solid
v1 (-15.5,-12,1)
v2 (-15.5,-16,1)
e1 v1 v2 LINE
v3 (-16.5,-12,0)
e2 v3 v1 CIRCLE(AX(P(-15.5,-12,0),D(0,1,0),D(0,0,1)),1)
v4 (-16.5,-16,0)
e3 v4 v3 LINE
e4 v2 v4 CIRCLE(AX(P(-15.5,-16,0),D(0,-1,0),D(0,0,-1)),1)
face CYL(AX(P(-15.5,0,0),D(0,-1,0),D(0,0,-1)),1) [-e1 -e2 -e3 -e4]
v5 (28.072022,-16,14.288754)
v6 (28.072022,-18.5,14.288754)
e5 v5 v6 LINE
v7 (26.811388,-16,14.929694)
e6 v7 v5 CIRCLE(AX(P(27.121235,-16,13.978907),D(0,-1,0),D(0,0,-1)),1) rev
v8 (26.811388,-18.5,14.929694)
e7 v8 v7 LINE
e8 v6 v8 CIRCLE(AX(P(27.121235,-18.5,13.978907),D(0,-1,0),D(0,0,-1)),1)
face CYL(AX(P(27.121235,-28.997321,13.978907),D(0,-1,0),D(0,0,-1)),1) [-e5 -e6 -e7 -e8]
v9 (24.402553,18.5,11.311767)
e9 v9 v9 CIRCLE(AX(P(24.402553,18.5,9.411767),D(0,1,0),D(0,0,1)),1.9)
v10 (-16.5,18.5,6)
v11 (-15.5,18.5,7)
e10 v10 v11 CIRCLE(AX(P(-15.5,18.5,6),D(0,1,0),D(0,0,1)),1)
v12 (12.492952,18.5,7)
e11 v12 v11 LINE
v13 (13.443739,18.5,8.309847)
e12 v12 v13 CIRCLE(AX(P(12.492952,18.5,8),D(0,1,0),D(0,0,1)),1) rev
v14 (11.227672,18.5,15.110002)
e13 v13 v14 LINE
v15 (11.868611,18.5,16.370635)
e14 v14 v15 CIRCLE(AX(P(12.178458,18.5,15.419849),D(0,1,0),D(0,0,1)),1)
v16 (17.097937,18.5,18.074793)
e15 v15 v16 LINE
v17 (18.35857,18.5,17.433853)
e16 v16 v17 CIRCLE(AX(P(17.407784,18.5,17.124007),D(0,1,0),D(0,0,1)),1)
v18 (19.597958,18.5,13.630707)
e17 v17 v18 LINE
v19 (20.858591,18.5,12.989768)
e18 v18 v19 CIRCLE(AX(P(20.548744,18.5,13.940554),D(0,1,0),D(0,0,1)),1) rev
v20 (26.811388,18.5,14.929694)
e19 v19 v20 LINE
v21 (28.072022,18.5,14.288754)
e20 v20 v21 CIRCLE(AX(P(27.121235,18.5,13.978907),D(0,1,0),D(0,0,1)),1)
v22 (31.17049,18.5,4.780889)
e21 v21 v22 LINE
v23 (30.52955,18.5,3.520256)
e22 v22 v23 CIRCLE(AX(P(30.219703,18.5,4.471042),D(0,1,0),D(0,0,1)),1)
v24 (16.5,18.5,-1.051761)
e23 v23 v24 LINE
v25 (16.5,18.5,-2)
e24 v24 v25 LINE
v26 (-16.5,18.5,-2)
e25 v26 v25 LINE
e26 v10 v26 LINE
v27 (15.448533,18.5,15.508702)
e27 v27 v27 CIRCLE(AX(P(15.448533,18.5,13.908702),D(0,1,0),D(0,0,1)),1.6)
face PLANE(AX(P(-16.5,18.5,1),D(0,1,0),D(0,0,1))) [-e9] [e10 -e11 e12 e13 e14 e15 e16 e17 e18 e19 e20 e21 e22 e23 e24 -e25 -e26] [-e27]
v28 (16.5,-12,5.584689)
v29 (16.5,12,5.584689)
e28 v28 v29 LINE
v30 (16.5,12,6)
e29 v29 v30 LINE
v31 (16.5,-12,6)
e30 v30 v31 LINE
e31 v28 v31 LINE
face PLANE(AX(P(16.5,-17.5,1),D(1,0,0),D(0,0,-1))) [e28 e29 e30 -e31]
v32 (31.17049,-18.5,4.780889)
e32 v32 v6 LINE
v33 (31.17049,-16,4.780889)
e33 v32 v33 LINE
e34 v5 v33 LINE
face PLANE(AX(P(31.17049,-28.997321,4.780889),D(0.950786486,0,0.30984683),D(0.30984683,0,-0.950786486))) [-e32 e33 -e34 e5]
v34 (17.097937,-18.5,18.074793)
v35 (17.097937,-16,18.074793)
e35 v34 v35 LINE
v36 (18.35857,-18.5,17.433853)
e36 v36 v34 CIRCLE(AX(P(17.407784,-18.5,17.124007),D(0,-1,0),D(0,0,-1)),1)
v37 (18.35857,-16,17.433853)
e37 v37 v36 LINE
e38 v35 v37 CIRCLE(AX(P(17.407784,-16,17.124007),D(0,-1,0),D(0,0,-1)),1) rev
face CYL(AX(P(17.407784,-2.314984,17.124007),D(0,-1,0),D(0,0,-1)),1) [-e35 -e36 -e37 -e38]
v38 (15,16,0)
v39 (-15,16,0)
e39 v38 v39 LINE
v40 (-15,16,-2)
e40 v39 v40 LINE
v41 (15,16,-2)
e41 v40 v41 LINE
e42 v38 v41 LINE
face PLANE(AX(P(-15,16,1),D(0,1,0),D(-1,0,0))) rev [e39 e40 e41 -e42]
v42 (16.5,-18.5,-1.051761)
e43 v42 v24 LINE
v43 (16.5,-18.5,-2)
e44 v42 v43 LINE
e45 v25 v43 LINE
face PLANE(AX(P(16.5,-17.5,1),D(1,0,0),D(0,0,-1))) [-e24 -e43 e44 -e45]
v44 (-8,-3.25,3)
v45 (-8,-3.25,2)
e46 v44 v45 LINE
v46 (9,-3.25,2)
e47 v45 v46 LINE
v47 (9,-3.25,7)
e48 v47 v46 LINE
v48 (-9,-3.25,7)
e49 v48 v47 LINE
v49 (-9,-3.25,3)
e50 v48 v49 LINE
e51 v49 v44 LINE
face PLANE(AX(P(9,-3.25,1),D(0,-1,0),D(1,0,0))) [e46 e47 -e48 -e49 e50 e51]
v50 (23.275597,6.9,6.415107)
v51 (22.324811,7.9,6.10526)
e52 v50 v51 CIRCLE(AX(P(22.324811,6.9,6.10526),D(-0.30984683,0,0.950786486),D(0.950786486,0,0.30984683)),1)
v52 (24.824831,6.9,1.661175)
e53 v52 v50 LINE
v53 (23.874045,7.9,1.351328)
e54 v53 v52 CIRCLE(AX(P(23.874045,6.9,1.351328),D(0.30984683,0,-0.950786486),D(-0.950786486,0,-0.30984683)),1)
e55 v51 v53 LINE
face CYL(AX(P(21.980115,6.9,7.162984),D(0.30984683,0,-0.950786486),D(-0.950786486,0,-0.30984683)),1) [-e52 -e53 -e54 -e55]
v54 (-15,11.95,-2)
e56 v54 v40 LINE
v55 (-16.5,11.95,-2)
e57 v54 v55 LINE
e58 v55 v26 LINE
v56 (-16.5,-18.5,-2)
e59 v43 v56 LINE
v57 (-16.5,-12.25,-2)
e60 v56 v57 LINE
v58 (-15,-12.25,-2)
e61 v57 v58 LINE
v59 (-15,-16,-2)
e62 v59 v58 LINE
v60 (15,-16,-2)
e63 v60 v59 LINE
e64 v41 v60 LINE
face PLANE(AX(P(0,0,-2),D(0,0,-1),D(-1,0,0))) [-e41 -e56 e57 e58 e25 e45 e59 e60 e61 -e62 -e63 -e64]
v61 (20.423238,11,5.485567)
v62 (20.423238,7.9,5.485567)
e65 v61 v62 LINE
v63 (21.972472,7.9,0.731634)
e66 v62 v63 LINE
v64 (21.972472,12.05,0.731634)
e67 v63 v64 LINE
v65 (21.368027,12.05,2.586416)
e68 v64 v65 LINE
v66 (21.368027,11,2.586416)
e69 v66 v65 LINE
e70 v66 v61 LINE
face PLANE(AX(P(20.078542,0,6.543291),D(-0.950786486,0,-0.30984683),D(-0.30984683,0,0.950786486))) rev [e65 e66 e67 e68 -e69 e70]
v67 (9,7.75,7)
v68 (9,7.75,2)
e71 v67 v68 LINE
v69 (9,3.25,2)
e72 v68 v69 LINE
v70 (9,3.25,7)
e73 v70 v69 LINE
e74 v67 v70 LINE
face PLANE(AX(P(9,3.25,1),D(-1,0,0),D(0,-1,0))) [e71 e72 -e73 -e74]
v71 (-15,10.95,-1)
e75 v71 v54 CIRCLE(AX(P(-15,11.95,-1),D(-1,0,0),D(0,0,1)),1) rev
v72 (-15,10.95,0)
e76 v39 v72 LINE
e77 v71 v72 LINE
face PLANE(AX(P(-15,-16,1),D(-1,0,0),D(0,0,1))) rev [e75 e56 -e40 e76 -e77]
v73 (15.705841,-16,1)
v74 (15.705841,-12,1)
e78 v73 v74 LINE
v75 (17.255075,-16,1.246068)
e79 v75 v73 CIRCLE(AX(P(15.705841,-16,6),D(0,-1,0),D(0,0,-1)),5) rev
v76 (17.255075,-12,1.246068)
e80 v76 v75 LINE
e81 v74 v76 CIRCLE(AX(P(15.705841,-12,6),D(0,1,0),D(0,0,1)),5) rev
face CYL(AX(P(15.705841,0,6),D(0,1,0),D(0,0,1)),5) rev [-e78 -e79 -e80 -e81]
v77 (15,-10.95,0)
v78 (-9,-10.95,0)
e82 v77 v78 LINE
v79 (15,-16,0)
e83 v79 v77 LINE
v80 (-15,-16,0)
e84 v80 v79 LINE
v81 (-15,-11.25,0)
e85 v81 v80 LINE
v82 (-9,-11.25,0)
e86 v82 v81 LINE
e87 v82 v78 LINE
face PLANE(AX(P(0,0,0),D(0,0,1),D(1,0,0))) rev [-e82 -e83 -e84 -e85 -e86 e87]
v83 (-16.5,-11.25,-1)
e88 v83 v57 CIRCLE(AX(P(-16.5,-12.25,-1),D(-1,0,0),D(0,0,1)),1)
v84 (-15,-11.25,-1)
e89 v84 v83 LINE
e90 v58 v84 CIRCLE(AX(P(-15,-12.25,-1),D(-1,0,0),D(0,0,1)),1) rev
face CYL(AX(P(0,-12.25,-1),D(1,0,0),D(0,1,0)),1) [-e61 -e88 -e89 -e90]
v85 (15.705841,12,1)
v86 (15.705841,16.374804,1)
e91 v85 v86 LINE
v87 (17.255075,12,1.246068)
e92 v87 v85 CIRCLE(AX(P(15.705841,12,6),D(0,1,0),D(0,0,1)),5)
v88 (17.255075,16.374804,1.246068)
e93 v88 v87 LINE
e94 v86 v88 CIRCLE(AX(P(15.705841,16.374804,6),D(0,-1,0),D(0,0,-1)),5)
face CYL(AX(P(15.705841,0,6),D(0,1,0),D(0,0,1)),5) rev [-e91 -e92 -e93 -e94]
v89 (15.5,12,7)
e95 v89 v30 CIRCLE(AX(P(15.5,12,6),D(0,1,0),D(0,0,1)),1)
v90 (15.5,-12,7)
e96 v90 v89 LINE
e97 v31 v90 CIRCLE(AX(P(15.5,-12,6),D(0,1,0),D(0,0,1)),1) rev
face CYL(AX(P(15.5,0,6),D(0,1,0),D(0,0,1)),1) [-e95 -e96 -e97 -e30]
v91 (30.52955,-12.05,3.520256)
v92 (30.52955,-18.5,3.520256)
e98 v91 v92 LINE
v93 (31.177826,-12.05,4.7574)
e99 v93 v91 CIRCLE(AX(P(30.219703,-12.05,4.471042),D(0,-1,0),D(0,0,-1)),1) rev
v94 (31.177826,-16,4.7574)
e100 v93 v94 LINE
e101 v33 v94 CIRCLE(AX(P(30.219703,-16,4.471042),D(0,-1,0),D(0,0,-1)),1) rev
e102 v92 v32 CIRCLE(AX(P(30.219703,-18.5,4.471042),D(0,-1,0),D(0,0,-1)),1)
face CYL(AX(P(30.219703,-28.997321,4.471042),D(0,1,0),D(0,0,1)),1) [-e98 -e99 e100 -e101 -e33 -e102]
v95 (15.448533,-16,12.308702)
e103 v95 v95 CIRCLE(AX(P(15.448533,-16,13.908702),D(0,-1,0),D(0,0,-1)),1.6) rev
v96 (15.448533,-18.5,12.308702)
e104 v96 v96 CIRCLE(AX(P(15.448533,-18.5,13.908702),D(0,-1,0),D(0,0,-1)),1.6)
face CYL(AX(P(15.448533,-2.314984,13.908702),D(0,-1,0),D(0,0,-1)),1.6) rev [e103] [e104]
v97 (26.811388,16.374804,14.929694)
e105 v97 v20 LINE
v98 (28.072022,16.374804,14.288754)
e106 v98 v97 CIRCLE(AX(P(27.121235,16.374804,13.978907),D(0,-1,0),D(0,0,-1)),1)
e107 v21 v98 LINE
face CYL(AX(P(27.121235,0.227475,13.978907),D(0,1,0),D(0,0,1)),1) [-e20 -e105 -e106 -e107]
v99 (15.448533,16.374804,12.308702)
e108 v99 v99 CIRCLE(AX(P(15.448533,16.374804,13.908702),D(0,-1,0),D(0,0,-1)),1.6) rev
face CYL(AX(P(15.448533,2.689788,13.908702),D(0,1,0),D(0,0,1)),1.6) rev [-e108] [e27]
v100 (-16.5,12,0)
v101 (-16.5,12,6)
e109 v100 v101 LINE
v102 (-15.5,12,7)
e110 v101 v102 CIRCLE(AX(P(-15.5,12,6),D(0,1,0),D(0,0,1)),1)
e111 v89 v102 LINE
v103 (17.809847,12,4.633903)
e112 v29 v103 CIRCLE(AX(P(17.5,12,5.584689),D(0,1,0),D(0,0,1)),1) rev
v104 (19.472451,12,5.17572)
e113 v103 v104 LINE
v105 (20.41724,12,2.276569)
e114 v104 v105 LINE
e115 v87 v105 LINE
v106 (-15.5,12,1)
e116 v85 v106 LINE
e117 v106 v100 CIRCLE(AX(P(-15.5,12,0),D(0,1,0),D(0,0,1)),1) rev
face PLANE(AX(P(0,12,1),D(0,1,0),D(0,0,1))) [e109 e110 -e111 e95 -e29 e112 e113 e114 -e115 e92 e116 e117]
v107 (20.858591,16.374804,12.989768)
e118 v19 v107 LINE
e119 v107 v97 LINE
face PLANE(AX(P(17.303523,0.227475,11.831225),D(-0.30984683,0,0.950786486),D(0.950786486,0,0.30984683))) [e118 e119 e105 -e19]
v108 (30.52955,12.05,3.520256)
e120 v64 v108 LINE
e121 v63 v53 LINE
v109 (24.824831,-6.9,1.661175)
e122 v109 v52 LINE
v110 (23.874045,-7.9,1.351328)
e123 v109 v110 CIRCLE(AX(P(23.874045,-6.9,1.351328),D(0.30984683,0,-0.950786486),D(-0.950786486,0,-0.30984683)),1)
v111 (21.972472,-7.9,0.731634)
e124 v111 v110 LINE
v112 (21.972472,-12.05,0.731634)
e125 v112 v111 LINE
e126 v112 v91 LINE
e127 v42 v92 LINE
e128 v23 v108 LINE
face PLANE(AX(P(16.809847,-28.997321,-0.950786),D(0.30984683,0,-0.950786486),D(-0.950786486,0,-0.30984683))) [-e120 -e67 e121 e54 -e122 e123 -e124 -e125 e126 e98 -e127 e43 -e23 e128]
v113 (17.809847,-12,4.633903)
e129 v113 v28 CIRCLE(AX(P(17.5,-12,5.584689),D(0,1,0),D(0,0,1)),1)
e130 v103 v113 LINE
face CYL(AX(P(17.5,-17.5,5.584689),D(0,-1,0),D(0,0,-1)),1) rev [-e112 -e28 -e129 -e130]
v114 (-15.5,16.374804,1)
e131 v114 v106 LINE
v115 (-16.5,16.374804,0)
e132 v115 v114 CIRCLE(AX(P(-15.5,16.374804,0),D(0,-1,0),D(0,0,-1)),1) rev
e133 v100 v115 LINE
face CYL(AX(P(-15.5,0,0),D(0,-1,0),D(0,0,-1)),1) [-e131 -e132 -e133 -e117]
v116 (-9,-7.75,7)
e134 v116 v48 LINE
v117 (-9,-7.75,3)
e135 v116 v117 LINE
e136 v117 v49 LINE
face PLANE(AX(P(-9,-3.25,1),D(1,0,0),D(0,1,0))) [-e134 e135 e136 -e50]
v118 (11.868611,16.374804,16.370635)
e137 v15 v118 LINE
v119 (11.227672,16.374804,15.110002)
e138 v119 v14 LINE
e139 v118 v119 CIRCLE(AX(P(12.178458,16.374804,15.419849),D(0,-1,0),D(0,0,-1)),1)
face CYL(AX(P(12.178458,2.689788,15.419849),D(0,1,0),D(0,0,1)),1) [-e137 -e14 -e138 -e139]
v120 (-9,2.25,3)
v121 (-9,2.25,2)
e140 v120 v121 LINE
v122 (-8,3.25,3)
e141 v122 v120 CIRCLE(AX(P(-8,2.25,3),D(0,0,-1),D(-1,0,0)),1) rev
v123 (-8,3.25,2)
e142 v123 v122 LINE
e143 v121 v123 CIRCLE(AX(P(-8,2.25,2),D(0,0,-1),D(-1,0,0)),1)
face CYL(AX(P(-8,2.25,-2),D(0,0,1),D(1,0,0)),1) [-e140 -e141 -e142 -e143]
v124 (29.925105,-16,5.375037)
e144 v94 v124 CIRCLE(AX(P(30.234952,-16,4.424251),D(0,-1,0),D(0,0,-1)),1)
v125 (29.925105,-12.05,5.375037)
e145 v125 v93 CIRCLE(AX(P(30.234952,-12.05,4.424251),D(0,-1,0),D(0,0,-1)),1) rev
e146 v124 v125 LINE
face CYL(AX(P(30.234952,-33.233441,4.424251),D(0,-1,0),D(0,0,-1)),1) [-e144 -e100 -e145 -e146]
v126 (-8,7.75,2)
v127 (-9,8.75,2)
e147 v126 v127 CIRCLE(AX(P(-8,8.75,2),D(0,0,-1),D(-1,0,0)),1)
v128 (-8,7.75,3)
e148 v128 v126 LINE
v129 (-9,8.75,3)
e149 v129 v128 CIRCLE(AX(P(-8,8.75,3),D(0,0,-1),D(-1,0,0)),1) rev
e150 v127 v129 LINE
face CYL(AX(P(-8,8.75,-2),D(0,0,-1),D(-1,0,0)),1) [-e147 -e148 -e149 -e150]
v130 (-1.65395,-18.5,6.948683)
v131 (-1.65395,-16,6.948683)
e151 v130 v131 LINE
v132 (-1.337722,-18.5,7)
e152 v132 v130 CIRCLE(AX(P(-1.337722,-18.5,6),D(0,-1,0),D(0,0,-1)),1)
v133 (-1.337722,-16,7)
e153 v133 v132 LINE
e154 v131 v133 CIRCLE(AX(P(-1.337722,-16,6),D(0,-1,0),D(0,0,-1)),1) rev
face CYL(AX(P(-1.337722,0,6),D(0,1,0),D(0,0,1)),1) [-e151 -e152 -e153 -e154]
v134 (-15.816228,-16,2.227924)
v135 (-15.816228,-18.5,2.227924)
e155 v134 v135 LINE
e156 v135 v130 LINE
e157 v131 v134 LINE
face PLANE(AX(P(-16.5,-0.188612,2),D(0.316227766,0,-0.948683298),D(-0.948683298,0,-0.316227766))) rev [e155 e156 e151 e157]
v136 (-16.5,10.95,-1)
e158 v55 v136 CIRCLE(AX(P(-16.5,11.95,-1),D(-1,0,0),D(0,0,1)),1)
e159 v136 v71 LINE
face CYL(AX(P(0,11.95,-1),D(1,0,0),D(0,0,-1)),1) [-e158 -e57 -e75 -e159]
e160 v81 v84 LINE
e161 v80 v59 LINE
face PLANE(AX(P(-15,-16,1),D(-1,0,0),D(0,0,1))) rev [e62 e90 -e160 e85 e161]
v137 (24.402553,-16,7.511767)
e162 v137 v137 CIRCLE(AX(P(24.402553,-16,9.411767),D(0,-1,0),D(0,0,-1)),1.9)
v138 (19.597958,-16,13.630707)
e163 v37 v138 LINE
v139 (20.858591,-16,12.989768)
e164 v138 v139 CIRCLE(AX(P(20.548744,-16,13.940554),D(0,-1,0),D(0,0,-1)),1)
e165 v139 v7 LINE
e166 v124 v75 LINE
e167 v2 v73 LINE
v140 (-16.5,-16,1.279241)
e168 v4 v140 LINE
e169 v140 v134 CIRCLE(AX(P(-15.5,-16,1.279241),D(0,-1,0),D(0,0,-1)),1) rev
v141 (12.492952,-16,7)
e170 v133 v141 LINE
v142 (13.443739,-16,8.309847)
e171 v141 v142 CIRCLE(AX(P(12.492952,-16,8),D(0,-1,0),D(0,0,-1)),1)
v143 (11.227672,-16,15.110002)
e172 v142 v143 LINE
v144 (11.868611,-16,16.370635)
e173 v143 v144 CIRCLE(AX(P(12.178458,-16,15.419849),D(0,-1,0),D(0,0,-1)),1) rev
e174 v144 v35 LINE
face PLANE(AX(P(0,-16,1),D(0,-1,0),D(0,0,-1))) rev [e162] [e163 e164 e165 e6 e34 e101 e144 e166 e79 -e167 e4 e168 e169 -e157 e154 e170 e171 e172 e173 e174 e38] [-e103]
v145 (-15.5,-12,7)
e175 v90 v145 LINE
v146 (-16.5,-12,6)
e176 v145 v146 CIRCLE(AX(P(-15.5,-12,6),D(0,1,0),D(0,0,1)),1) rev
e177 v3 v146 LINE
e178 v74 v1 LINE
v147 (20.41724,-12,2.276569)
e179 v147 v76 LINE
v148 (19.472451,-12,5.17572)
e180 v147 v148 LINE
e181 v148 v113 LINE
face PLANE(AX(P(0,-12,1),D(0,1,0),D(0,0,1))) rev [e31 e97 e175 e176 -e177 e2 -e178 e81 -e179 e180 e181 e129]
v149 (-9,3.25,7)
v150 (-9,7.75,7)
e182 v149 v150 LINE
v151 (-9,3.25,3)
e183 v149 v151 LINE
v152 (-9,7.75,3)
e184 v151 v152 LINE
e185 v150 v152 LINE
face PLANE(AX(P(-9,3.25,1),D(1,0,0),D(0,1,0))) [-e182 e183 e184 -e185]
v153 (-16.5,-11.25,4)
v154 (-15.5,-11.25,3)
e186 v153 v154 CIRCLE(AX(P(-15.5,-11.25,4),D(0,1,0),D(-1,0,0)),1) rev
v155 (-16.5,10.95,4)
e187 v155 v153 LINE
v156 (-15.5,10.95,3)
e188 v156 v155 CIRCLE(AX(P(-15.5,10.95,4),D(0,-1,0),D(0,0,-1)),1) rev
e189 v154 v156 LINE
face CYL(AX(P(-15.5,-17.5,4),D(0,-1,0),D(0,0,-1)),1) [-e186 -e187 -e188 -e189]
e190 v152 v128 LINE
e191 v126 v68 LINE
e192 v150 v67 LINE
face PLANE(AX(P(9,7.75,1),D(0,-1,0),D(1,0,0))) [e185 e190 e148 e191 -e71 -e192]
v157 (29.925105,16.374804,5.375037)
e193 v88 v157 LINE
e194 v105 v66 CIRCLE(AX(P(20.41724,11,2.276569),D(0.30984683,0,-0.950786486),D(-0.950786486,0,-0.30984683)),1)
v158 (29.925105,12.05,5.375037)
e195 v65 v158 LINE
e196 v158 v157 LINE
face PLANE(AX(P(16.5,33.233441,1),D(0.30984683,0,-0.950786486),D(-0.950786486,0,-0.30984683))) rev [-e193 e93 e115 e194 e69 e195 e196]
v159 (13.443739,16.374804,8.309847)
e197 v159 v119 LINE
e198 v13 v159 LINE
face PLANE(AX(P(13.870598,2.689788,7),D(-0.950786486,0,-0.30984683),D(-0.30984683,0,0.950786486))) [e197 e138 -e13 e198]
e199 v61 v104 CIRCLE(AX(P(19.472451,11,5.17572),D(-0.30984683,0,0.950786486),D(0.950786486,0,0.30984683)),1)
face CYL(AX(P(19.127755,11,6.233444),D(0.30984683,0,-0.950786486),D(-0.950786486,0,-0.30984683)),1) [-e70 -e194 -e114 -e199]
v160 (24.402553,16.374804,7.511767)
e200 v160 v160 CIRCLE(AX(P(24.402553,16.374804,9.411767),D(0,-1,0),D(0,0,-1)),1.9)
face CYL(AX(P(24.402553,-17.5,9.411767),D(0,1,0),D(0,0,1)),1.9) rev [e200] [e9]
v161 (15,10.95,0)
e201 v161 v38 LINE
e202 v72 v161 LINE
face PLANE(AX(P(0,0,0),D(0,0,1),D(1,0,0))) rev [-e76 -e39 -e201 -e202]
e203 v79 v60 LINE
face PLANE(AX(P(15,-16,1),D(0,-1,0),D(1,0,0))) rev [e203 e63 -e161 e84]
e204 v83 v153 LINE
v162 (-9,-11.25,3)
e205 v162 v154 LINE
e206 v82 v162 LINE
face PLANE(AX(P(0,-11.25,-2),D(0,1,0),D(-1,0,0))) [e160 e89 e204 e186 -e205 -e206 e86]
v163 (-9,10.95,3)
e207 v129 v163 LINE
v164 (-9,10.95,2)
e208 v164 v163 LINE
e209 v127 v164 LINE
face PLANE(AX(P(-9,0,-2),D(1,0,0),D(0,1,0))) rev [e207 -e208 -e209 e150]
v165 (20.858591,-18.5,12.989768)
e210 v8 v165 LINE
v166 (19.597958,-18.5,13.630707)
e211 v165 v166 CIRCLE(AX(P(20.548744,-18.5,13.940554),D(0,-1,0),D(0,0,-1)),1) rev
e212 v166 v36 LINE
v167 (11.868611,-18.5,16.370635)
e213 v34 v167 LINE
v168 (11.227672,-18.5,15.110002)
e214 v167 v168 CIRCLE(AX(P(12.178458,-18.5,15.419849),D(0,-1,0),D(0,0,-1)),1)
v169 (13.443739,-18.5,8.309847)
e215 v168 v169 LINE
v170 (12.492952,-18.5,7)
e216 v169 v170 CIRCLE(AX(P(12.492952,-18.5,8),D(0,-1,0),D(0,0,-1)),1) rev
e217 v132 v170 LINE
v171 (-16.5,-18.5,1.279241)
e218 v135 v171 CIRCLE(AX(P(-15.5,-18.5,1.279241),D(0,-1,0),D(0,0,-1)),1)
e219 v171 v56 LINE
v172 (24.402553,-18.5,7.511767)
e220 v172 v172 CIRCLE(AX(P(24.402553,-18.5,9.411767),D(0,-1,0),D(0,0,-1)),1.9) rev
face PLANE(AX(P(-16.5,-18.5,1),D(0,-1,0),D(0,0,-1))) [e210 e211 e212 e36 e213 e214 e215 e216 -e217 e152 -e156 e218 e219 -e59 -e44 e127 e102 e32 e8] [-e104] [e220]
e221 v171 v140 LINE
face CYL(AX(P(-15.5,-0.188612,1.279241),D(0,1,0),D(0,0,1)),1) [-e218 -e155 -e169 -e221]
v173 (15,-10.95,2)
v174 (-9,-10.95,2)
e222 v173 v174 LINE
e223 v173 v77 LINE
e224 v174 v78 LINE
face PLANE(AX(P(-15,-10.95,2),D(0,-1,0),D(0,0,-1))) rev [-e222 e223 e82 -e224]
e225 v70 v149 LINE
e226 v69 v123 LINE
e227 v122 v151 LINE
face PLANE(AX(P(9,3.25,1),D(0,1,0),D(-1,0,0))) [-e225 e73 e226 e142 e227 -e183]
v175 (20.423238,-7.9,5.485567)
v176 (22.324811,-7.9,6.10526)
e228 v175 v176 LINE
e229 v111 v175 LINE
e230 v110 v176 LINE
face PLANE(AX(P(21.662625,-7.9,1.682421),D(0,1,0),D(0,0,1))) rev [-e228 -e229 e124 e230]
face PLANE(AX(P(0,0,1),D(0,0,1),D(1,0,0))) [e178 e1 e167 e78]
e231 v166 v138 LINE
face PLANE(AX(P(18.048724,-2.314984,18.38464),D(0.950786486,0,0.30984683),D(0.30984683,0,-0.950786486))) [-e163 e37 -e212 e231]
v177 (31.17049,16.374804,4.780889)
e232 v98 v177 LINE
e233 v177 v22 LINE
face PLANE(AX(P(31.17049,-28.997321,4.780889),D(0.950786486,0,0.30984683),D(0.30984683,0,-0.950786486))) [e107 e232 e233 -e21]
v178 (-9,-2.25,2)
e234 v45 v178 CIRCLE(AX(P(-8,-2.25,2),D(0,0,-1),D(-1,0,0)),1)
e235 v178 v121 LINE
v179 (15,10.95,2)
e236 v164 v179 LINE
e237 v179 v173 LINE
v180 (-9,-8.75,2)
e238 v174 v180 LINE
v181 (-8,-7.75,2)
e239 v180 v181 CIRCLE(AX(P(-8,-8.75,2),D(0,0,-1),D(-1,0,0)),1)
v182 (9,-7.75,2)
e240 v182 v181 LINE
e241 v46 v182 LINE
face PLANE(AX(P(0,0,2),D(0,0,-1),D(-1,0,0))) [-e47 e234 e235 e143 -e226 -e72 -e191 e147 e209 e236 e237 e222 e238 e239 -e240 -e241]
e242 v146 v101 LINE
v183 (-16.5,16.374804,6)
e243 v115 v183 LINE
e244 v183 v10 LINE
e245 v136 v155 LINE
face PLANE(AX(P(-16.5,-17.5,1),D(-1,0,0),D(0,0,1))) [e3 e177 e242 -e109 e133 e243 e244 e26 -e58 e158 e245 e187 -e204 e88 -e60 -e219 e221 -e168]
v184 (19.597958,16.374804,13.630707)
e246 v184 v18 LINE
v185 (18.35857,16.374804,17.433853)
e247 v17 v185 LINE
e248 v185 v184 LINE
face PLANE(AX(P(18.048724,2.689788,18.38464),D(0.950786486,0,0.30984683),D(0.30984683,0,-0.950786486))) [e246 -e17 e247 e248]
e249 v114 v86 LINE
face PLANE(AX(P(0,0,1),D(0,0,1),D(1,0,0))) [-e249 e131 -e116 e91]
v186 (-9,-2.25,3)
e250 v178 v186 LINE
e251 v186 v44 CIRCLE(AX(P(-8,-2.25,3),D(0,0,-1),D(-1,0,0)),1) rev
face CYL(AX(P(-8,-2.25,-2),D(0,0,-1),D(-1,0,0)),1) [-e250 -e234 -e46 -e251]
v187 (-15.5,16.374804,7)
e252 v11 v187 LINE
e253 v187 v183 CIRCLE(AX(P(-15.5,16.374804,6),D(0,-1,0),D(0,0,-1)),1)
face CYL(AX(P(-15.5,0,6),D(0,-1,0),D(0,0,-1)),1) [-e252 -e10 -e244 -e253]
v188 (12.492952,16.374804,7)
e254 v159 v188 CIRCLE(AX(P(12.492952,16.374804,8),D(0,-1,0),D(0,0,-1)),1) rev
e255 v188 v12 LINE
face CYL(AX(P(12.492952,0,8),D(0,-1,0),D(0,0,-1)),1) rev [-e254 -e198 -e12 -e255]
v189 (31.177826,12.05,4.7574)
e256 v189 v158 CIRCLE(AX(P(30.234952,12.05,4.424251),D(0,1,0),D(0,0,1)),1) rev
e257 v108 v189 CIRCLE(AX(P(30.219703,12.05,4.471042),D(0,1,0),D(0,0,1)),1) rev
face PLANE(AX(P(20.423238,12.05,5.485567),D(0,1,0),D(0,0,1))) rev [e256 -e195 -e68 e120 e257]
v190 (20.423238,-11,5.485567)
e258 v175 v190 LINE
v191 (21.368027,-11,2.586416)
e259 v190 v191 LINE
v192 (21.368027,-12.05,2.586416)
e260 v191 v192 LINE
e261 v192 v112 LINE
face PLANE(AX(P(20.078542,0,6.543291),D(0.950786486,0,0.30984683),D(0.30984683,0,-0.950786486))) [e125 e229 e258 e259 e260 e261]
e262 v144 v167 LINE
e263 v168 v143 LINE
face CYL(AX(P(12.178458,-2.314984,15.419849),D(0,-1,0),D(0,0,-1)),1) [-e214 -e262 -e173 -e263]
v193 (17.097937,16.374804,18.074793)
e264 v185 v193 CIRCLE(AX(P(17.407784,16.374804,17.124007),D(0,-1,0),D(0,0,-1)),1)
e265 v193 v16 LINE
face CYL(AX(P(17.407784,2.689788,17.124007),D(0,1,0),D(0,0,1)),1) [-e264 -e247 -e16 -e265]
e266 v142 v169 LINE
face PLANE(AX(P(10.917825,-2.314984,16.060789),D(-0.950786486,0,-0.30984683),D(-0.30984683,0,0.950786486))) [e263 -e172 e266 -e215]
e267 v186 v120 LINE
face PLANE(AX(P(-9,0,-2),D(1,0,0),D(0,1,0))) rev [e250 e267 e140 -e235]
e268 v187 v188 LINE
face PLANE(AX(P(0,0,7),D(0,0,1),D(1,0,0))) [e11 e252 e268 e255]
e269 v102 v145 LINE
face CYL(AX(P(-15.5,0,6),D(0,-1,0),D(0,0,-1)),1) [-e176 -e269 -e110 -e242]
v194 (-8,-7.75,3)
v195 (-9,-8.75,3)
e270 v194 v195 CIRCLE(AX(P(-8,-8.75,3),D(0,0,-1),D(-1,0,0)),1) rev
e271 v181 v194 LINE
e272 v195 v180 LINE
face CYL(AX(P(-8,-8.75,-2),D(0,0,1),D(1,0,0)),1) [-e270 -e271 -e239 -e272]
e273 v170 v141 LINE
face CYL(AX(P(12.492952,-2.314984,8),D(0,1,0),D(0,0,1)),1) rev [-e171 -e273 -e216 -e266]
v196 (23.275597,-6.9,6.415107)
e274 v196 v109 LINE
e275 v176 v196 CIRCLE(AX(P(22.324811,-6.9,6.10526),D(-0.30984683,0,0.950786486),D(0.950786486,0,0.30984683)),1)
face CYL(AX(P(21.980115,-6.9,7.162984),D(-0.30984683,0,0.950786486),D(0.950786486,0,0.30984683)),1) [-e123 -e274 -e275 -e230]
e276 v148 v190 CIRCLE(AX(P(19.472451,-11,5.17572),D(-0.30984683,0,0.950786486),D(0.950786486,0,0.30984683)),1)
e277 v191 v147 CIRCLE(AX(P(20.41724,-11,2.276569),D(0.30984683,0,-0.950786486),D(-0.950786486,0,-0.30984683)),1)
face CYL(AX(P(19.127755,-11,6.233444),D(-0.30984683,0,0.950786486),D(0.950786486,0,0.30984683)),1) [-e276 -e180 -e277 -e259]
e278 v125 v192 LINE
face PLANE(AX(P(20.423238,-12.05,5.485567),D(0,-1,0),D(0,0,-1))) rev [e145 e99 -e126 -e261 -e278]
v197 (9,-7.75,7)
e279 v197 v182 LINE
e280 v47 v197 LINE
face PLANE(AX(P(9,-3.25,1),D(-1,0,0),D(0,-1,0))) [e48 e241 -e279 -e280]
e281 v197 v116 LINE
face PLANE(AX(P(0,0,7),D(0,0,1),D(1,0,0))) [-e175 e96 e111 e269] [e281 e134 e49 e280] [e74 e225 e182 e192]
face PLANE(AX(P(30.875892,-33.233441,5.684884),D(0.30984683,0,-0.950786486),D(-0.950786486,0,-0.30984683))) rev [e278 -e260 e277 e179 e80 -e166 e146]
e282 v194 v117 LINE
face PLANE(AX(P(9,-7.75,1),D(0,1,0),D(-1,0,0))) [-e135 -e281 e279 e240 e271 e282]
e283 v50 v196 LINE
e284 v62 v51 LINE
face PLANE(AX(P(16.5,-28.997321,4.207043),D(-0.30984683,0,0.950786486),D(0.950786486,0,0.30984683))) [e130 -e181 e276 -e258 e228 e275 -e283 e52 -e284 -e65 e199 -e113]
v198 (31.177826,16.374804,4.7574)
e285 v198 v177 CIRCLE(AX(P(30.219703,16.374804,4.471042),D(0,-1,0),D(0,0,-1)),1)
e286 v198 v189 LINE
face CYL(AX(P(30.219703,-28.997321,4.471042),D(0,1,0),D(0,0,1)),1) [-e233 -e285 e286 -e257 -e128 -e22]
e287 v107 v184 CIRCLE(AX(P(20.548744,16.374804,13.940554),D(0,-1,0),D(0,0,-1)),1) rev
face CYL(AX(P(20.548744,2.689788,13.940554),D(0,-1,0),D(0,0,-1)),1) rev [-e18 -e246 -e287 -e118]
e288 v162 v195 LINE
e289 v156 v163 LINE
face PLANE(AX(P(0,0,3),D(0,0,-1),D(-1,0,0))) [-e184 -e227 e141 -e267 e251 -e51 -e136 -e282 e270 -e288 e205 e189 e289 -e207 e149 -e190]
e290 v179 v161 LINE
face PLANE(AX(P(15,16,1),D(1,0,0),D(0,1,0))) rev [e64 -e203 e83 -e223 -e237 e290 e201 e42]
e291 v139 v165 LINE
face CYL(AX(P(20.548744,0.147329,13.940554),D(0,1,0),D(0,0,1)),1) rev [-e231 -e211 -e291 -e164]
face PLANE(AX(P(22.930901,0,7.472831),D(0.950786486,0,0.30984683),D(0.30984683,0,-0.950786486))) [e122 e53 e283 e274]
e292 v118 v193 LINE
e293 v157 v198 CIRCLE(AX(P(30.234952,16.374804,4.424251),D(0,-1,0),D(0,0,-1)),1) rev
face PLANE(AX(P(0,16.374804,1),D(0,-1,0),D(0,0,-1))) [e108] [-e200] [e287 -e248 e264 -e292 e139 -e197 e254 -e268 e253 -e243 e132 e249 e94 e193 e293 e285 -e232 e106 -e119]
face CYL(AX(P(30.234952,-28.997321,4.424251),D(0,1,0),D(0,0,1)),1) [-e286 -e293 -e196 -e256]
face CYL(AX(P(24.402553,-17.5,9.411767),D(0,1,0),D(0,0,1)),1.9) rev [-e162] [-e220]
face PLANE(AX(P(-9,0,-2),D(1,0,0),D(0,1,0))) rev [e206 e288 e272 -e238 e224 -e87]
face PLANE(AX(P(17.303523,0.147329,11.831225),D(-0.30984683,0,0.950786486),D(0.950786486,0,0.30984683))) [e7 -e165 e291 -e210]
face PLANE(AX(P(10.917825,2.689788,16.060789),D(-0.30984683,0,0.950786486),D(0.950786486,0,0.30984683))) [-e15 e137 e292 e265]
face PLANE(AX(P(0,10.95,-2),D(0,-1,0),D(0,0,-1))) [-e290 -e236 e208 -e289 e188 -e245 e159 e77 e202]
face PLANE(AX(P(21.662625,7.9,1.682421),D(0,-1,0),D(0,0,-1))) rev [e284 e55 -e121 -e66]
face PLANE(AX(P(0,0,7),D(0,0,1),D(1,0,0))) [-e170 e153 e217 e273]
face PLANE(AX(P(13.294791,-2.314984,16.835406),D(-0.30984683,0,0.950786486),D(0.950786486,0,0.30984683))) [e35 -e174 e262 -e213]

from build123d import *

# Parameters (mm, degrees)
EXTRUDE_1_DEPTH          = 1
EXTRUDE_2_DEPTH          = 2
EXTRUDE_2_DEPTH_BACK     = 1
SKETCH_2_W               = 33
SKETCH_2_H               = 35.000000000000014
SKETCH_3_W               = 33
SKETCH_3_H               = 35.000000000000014
EXTRUDE_3_DEPTH          = 6
SKETCH_7_W               = 33
SKETCH_7_H               = 4.000000000000002
CUT_EXTRUDE_5_DEPTH      = 6
EXTRUDE_5_DEPTH          = 24
EXTRUDE_6_REACH          = 45.767
EXTRUDE_7_DEPTH          = 5.5
SKETCH_14_W              = 15.119999999999994
SKETCH_14_H              = 1.500000000000007
EXTRUDE_8_DEPTH          = 3.049213514
CUT_EXTRUDE_8_DEPTH      = 2
CUT_EXTRUDE_8_DEPTH_BACK = 2
SKETCH_18_W              = 3.999999999999984
SKETCH_18_H              = 4
CUT_EXTRUDE_10_DEPTH     = 10
FILLET_1_R               = 5
EXTRUDE_9_DEPTH          = 1.125196054
EXTRUDE_10_DEPTH         = 1.5
SKETCH_22_R              = 1.8999999999999986
CUT_EXTRUDE_11_DEPTH     = 50.283293631156084
CUT_EXTRUDE_12_DEPTH     = 7
MOVE_FACE_1_BY           = 1
MOVE_FACE_2_BY           = 1
MOVE_START               = -18.5
MOVE_FACE_3_DEPTH        = 37
MOVE_FACE_3_2_DEPTH      = 6.5
MOVE_START_2             = 12
MOVE_FACE_3_3_DEPTH      = 6.5
MOVE_START_3             = -8
MOVE_FACE_3_4_DEPTH      = 16
EXTRUDE_11_DEPTH         = 2.125196054
EXTRUDE_12_DEPTH         = 2.5
SKETCH_27_R              = 1.6000000000000019
EXTRUDE_14_DEPTH         = 2.5
EXTRUDE_START            = -2.125196054
SKETCH_29_R              = 1.6000000000000019
EXTRUDE_15_DEPTH         = 2.125196054
MOVE_FACE_6_BY           = 1
MOVE_FACE_6_2_BY         = 1
CUT_EXTRUDE_13_DEPTH     = 2.5
MOVE_FACE_10_BY          = 1
SKETCH_31_W              = 30
SKETCH_31_H              = 21.900000000000002
CUT_EXTRUDE_14_DEPTH     = 2
FILLET_3_R               = 1
MOVE_FACE_4_BY           = 0.1
MOVE_FACE_4_2_BY         = 0.1
MOVE_FACE_5_BY           = 0.05
MOVE_FACE_5_2_BY         = 0.05
FILLET_4_R               = 1
FILLET_5_R               = 1


# Read off the part's stored shape, not the designer's step: 移动面3
with BuildPart() as part:
    # 草图1 → 凸台-拉伸1 (new body)
    with BuildSketch(Plane.XY):
        Polygon((15.000000000000005, -15.999999999999996), (-14.999999999999996, -16.000000000000004), (-14.999999999999996, 15.999999999999996), (15.000000000000004, 16), align=None)
        Polygon((9.000000000000004, 3.2500000000000013), (-8.999999999999996, 3.2499999999999987), (-8.999999999999995, 7.749999999999998), (9.000000000000005, 7.750000000000001), align=None, mode=Mode.SUBTRACT)
        Polygon((-8.999999999999996, -3.249999999999995), (-8.999999999999995, -7.749999999999995), (9.000000000000005, -7.749999999999997), (9.000000000000004, -3.249999999999998), align=None, mode=Mode.SUBTRACT)
    extrude(amount=EXTRUDE_1_DEPTH)

    # 草图2 → 凸台-拉伸2 (add, two sides: drawn at the far end of the back side and taken through both)
    with BuildSketch(Plane(origin=(0, 0, 0), x_dir=(-1, 0, 0), z_dir=(0, 0, -1)).offset(-EXTRUDE_2_DEPTH_BACK)):
        Rectangle(SKETCH_2_W, SKETCH_2_H)
        Polygon((14.999999999999996, -16.000000000000004), (14.999999999999996, 15.999999999999996), (-15.000000000000004, 16), (-15.000000000000005, -15.999999999999996), align=None, mode=Mode.SUBTRACT)
    extrude(amount=EXTRUDE_2_DEPTH + EXTRUDE_2_DEPTH_BACK)

    # 草图3 → 凸台-拉伸3 (add)
    with BuildSketch(Plane.XY.offset(1)):
        Rectangle(SKETCH_3_W, SKETCH_3_H)
        Polygon((-8.999999999999995, -7.749999999999995), (-8.999999999999996, -3.249999999999995), (9.000000000000004, -3.249999999999998), (9.000000000000005, -7.749999999999997), align=None, mode=Mode.SUBTRACT)
        Polygon((9.000000000000005, 7.750000000000001), (9.000000000000004, 3.2500000000000013), (-8.999999999999996, 3.2499999999999987), (-8.999999999999995, 7.749999999999998), align=None, mode=Mode.SUBTRACT)
    extrude(amount=EXTRUDE_3_DEPTH)

    # 草图7 → 切除-拉伸5 (cut)
    with BuildSketch(Plane.XY.offset(7)):
        Polygon((-16.5, 12.000000000000002), (16.5, 12.000000000000002), (16.499999999999996, 16.374803946020762), (-16.500000000000004, 16.374803946020762), align=None)
        with Locations((0, -14)):
            Rectangle(SKETCH_7_W, SKETCH_7_H)
    extrude(amount=-CUT_EXTRUDE_5_DEPTH, mode=Mode.SUBTRACT)

    # 草图9 → 凸台-拉伸5 (add)
    with BuildSketch(Plane(origin=(0, 12.000000000000002, 0), x_dir=(1, 0, 0), z_dir=(0, 1, 0))):
        Polygon((16.5, -4.207043388734913), (29.931102526972527, -8.584035071381752), (30.87589166823087, -5.684884069354349), (31.17048984690754, -4.78088912740533), (16.5, 0), (16.5, -1), align=None)
    extrude(amount=-EXTRUDE_5_DEPTH)

    # 凸台-拉伸6: up to this face of the body (flat: up to its plane)
    extrude_6_end = Plane(part.part.faces().sort_by_distance((0, 17.5, 2.5))[0])
    # 草图12 → 凸台-拉伸6 (add, up to the picked face)
    with BuildSketch(Plane(origin=(0, 12.000000000000002, 0), x_dir=(1, 0, 0), z_dir=(0, 1, 0)), mode=Mode.PRIVATE) as extrude_6_sk1:
        Polygon((16.5, -1), (30.87589166823087, -5.684884069354349), (31.17048984690754, -4.78088912740533), (16.5, 0), align=None)
    extrude_6_tool1 = split(extrude(extrude_6_sk1.sketch, amount=EXTRUDE_6_REACH, mode=Mode.PRIVATE), bisect_by=extrude_6_end, keep=Keep.BOTH, mode=Mode.PRIVATE)
    add(extrude_6_tool1.solids().sort_by(Axis((23.761844, 12, 2.864834), (0, 1, 0)))[0])

    # 草图13 → 凸台-拉伸7 (add)
    with BuildSketch(Plane.XZ.offset(11.999999999999998)):
        Polygon((16.5, 1), (16.5, 0), (31.17048984690754, 4.78088912740533), (30.87589166823087, 5.684884069354353), align=None)
    extrude(amount=EXTRUDE_7_DEPTH)

    # 草图14 → 凸台-拉伸8 (add)
    with BuildSketch(Plane(origin=(1.2894852791645197, 0, -3.9568750062159683), x_dir=(0.9507864859941054, 0, 0.3098468299837534), z_dir=(-0.3098468299837534, 0, 0.9507864859941054))):
        Polygon((15.997823848886494, 17.500000000000007), (31.11782384888649, 17.500000000000014), (31.11782384888649, 16.374803946020762), (15.997823848886494, 16.374803946020762), align=None)
        with Locations((23.557823848886493, -16.750000000000004)):
            Rectangle(SKETCH_14_W, SKETCH_14_H)
    extrude(amount=EXTRUDE_8_DEPTH)

    # 草图16 → 切除-拉伸8 (cut, two sides: drawn at the far end of the back side and taken through both)
    with BuildSketch(Plane(origin=(0, 0, 0), x_dir=(-1, 0, 0), z_dir=(0, 0, -1)).offset(-CUT_EXTRUDE_8_DEPTH_BACK)):
        Polygon((8.999999999999996, -7.749999999999995), (8.999999999999996, -11.249999999999995), (14.999999999999996, -11.249999999999998), (14.999999999999996, -7.749999999999995), (11.999999999999996, -7.749999999999995), (11.999999999999996, -3.2499999999999982), (14.999999999999996, -3.249999999999998), (14.999999999999996, 3.2499999999999987), (11.999999999999996, 3.2499999999999982), (11.999999999999996, 7.750000000000001), (14.999999999999996, 7.750000000000001), (14.999999999999996, 10.950000000000001), (8.999999999999998, 10.950000000000001), (8.999999999999998, 7.749999999999998), (8.999999999999996, 3.2499999999999982), (8.999999999999996, -3.2499999999999947), align=None)
        Polygon((11.999999999999996, 3.2499999999999982), (14.999999999999996, 3.2499999999999987), (14.999999999999996, 7.75), (11.999999999999996, 7.750000000000001), align=None)
        Polygon((11.999999999999996, -7.749999999999995), (14.999999999999996, -7.749999999999995), (14.999999999999996, -3.2499999999999982), (11.999999999999996, -3.249999999999998), align=None)
        Polygon((14.999999999999996, -7.749999999999995), (14.999999999999996, -11.249999999999998), (16.500000000000004, -11.249999999999995), (16.5, 10.950000000000001), (14.999999999999996, 10.950000000000001), (14.999999999999996, 7.750000000000001), (14.999999999999996, 3.25), (14.999999999999996, -3.249999999999998), align=None)
    extrude(amount=CUT_EXTRUDE_8_DEPTH + CUT_EXTRUDE_8_DEPTH_BACK, mode=Mode.SUBTRACT)

    # 草图18 → 切除-拉伸10 (cut)
    with BuildSketch(Plane(origin=(29.586406389066333, 0, 9.641759075570365), x_dir=(0.3098468299837543, 0, -0.9507864859941051), z_dir=(0.9507864859941051, 0, 0.3098468299837543))):
        Polygon((1.1124726947319783, 12.000000000000002), (5.112472694731979, 12.000000000000002), (5.112472694731981, 8.000000000000002), (1.11247269473198, 8), align=None)
        with Locations((3.112472694731972, -9.999999999999996)):
            Rectangle(SKETCH_18_W, SKETCH_18_H)
    extrude(amount=-CUT_EXTRUDE_10_DEPTH, mode=Mode.SUBTRACT)

    # 圆角1
    fillet_1_edges = [part.edges().sort_by_distance(p)[0] for p in [
        (16.5, 14.187401973010381, 1),
        (16.5, -14, 1),
    ]]
    fillet(fillet_1_edges, radius=FILLET_1_R)

    # 草图20 → 凸台-拉伸9 (add)
    with BuildSketch(Plane(origin=(0, 17.500000000000007, 0), x_dir=(1, 0, 0), z_dir=(0, 1, 0))):
        Polygon((29.93110252697253, -8.584035071381752), (19.47245118103737, -5.175719941560464), (17.303523371151098, -11.831225343519213), (27.762174717086257, -15.239540473340492), align=None)
    extrude(amount=-EXTRUDE_9_DEPTH)

    # 草图23 → 凸台-拉伸10 (add)
    with BuildSketch(Plane.XZ.offset(17.500000000000007)):
        Polygon((19.47245118103737, 5.175719941560467), (17.303523371151098, 11.831225343519213), (27.762174717086257, 15.239540473340492), (29.931102526972523, 8.584035071381754), align=None)
    extrude(amount=-EXTRUDE_10_DEPTH)

    # 草图22 → 切除-拉伸11 (cut, through all)
    with BuildSketch(Plane(origin=(0, 17.500000000000007, 0), x_dir=(1, 0, 0), z_dir=(0, 1, 0))):
        with Locations(Location((24.402553022042618, -9.411767136448253, 0), (0, 0, 270))):
            Circle(SKETCH_22_R)
    extrude(amount=-CUT_EXTRUDE_11_DEPTH, mode=Mode.SUBTRACT)

    # 草图24 → 切除-拉伸12 (cut)
    with BuildSketch(Plane(origin=(29.586406389066333, 0, 9.64175907557036), x_dir=(0.30984682998375473, 0, -0.9507864859941049), z_dir=(0.9507864859941049, 0, 0.30984682998375473))):
        Polygon((5.112472694731976, 8.000000000000002), (1.1124726947319747, 8), (1.1124726947319747, -7.9999999999999964), (5.112472694731961, -7.9999999999999964), align=None)
    extrude(amount=-CUT_EXTRUDE_12_DEPTH, mode=Mode.SUBTRACT)

    # Move Face 1: a face moved outward by 1.0
    extrude(part.faces().sort_by_distance((6.953272881, -17.5, 3.982460296))[0], amount=MOVE_FACE_1_BY, dir=(0, -1, 0))

    # Move Face 2: a face moved outward by 1.0
    extrude(part.faces().sort_by_distance((6.953272881, 17.5, 3.982460296))[0], amount=MOVE_FACE_2_BY, dir=(0, 1, 0))

    # Move Face 3 outline → Move Face 3 (add)
    with BuildSketch(Plane(origin=(0, 0, 0), x_dir=(1, 0, 0), z_dir=(0, 1, 0)).offset(MOVE_START)):
        Polygon((21.662624987, -1.682420828), (21.972471817, -0.731634342), (16.5, 1.051760847), (16.5, 0), align=None)
    extrude(amount=MOVE_FACE_3_DEPTH)

    # Move Face 3 2 outline → Move Face 3 2 (add)
    with BuildSketch(Plane(origin=(0, 0, 0), x_dir=(1, 0, 0), z_dir=(0, 1, 0)).offset(MOVE_START)):
        Polygon((31.170489847, -4.780889127), (31.480336677, -3.830102641), (21.972471817, -0.731634342), (21.662624987, -1.682420828), align=None)
    extrude(amount=MOVE_FACE_3_2_DEPTH)

    # Move Face 3 3 outline → Move Face 3 3 (add)
    with BuildSketch(Plane(origin=(0, 0, 0), x_dir=(1, 0, 0), z_dir=(0, 1, 0)).offset(MOVE_START_2)):
        Polygon((31.170489847, -4.780889127), (31.480336677, -3.830102641), (21.972471817, -0.731634342), (21.662624987, -1.682420828), align=None)
    extrude(amount=MOVE_FACE_3_3_DEPTH)

    # Move Face 3 4 outline → Move Face 3 4 (add)
    with BuildSketch(Plane(origin=(0, 0, 0), x_dir=(1, 0, 0), z_dir=(0, 1, 0)).offset(MOVE_START_3)):
        Polygon((24.514984445, -2.611961318), (24.824831275, -1.661174832), (21.972471817, -0.731634342), (21.662624987, -1.682420828), align=None)
    extrude(amount=MOVE_FACE_3_4_DEPTH)

    # 草图25 → 凸台-拉伸11 (add)
    with BuildSketch(Plane(origin=(0, 18.50000000000001, 0), x_dir=(1, 0, 0), z_dir=(0, 1, 0))):
        Polygon((19.47245118103737, -5.175719941560464), (17.303523371151098, -11.831225343519213), (15.153872120915374, -11.130686752292034), (16.5, -7), (16.5, -4.207043388734913), align=None)
    extrude(amount=-EXTRUDE_11_DEPTH)

    # 草图26 → 凸台-拉伸12 (add)
    with BuildSketch(Plane.XZ.offset(18.50000000000001)):
        Polygon((16.5, 4.207043388734913), (19.47245118103737, 5.175719941560467), (17.303523371151098, 11.831225343519213), (15.153872120915374, 11.130686752292034), (16.5, 7), align=None)
    extrude(amount=-EXTRUDE_12_DEPTH)

    # 草图27 → 凸台-拉伸14 (add)
    with BuildSketch(Plane.XZ.offset(18.50000000000001)):
        Polygon((13.29479114101286, 16.835405668256666), (10.917824926027595, 16.060788593297282), (13.870597882040693, 7), (16.5, 7), (15.153872120915374, 11.130686752292034), (18.957018064891795, 12.370074072227043), (17.09793708498928, 18.074792988191682), align=None)
        with Locations(Location((15.448533090379124, 13.90870243322237, 0), (0, 0, 270))):
            Circle(SKETCH_27_R, mode=Mode.SUBTRACT)
    extrude(amount=-EXTRUDE_14_DEPTH)

    # 草图29 → 凸台-拉伸15 (add)
    with BuildSketch(Plane(origin=(0, 18.50000000000001, 0), x_dir=(1, 0, 0), z_dir=(0, 1, 0)).offset(EXTRUDE_START)):
        Polygon((16.5, -7), (13.870597882040684, -7.000000000000003), (10.917824926027592, -16.060788593297286), (17.09793708498928, -18.074792988191682), (18.957018064891795, -12.370074072227045), (15.153872120915374, -11.130686752292034), align=None)
        with Locations(Location((15.448533090379124, -13.90870243322237, 0), (0, 0, 90))):
            Circle(SKETCH_29_R, mode=Mode.SUBTRACT)
    extrude(amount=EXTRUDE_15_DEPTH)

    # Move Face 6: a face moved outward by 1.0
    extrude(part.faces().sort_by_distance((18.027477575, 17.437401973, 15.22243353))[0], amount=MOVE_FACE_6_BY, dir=(0.950786486, 0, 0.30984683))

    # Move Face 6 2: a face moved outward by 1.0
    extrude(part.faces().sort_by_distance((18.027477575, -17.25, 15.22243353))[0], amount=MOVE_FACE_6_2_BY, dir=(0.950786486, 0, 0.30984683))

    # 草图30 → 切除-拉伸13 (cut)
    with BuildSketch(Plane.XZ.offset(18.50000000000001)):
        Polygon((-16.5, 2), (-1.5000000000000013, 7), (-16.5, 7), align=None)
    extrude(amount=-CUT_EXTRUDE_13_DEPTH, mode=Mode.SUBTRACT)

    # Move Face 10: a face moved inward by 1.0
    extrude(part.faces().sort_by_distance((-12.75, -0.15, 2))[0], amount=MOVE_FACE_10_BY, dir=(0, 0, 1), mode=Mode.SUBTRACT)

    # 草图31 → 切除-拉伸14 (cut)
    with BuildSketch(Plane(origin=(0, 0, 0), x_dir=(-1, 0, 0), z_dir=(0, 0, -1))):
        Rectangle(SKETCH_31_W, SKETCH_31_H)
    extrude(amount=-CUT_EXTRUDE_14_DEPTH, mode=Mode.SUBTRACT)

    # 圆角3
    # the kernel refuses this fillet: 1 mm, written as the material it adds along each edge
    with BuildSketch(Plane(origin=(16.5, 12.000000000000002, 4.207043388734913), x_dir=(0, 0, 1), z_dir=(0, -1, 0))) as fillet_3_piece_1:
        with BuildLine():
            CenterArc((FILLET_3_R * 1.37764561158, -FILLET_3_R), FILLET_3_R, 90, 108.04999999999995)
            Line((FILLET_3_R * 0.426859125591, -FILLET_3_R * 1.30984682998), (0, 0))
            Line((0, 0), (FILLET_3_R * 1.37764561158, 0))
        make_face()
    extrude(amount=24)
    with BuildSketch(Plane(origin=(13.870597882040693, -18.50000000000001, 7), x_dir=(-0.3098468299837539, 0, 0.9507864859941051), z_dir=(0, 1, 0))) as fillet_3_piece_2:
        with BuildLine():
            CenterArc((FILLET_3_R * 1.37764561158, -FILLET_3_R), FILLET_3_R, 89.99999999999999, 108.04999999999978)
            Line((FILLET_3_R * 0.426859125591, -FILLET_3_R * 1.30984682998), (0, 0))
            Line((0, 0), (FILLET_3_R * 1.37764561158, -3e-17))
        make_face()
    extrude(amount=2.5)
    with BuildSketch(Plane(origin=(19.907804550891793, -18.50000000000001, 12.679920902227042), x_dir=(0.9507864859983255, 0, 0.3098468299708036), z_dir=(0, 1, 0))) as fillet_3_piece_3:
        with BuildLine():
            CenterArc((FILLET_3_R, -FILLET_3_R), FILLET_3_R, 89.99999999921975, 90.00000000000004)
            Line((-1.362018e-11, -FILLET_3_R), (0, 0))
            Line((0, 0), (FILLET_3_R, -4e-17))
        make_face()
    extrude(amount=2.5)
    with BuildSketch(Plane(origin=(19.907804550891793, 16.37480394600001, 12.679920902227044), x_dir=(-0.3098468299837508, 0, 0.9507864859941062), z_dir=(0, 1, 0))) as fillet_3_piece_4:
        with BuildLine():
            CenterArc((FILLET_3_R, FILLET_3_R), FILLET_3_R, 179.99999999999997, 89.99999999999989)
            Line((-1.361734e-11, FILLET_3_R), (0, 0))
            Line((0, 0), (FILLET_3_R, -4e-17))
        make_face()
    extrude(amount=2.125196054)
    with BuildSketch(Plane(origin=(13.870597882040684, 16.37480394600001, 7.000000000000003), x_dir=(-0.30984682998375257, 0, 0.9507864859941055), z_dir=(0, 1, 0))) as fillet_3_piece_5:
        with BuildLine():
            CenterArc((FILLET_3_R * 1.37764561158, -FILLET_3_R), FILLET_3_R, 89.99999999999997, 108.04999999999961)
            Line((FILLET_3_R * 0.426859125591, -FILLET_3_R * 1.30984682998), (0, 0))
            Line((0, 0), (FILLET_3_R * 1.37764561158, 0))
        make_face()
    extrude(amount=2.125196054)
    # the kernel refuses this fillet: 1 mm, written as the material it takes off along each edge
    with BuildSketch(Plane(origin=(16.5, -14.499999999999998, 7), x_dir=(-1, 0, 0), z_dir=(0, 1, 0))) as fillet_3_2_piece_1:
        with BuildLine():
            CenterArc((FILLET_3_R, -FILLET_3_R), FILLET_3_R, 90, 90)
            Line((0, -FILLET_3_R), (0, 0))
            Line((0, 0), (FILLET_3_R, 0))
        make_face()
    extrude(amount=29, mode=Mode.SUBTRACT)
    with BuildSketch(Plane(origin=(-16.5, 14.500000000000002, 7), x_dir=(0, 0, -1), z_dir=(0, -1, 0))) as fillet_3_2_piece_2:
        with BuildLine():
            CenterArc((FILLET_3_R, FILLET_3_R), FILLET_3_R, 180, 90)
            Line((0, FILLET_3_R), (0, 0))
            Line((0, 0), (FILLET_3_R, 0))
        make_face()
    extrude(amount=29, mode=Mode.SUBTRACT)
    with BuildSketch(Plane(origin=(-16.500000000000004, 16.374803946020762, 1), x_dir=(1, 8.1e-16, 0), z_dir=(8.1e-16, -1, 0))) as fillet_3_2_piece_3:
        with BuildLine():
            CenterArc((FILLET_3_R, -FILLET_3_R), FILLET_3_R, 90, 90)
            Line((0, -FILLET_3_R), (0, 0))
            Line((0, 0), (FILLET_3_R, 0))
        make_face()
    extrude(amount=4.37480394602076, mode=Mode.SUBTRACT)
    with BuildSketch(Plane(origin=(-16.5, -11.999999999999998, 1), x_dir=(1, 0, 0), z_dir=(0, -1, 0))) as fillet_3_2_piece_4:
        with BuildLine():
            CenterArc((FILLET_3_R, -FILLET_3_R), FILLET_3_R, 90, 90)
            Line((0, -FILLET_3_R), (0, 0))
            Line((0, 0), (FILLET_3_R, 0))
        make_face()
    extrude(amount=4.000000000000002, mode=Mode.SUBTRACT)
    with BuildSketch(Plane(origin=(31.480336677, -21.000000000237698, 3.830102641), x_dir=(-0.9507864860193448, 0, -0.3098468299063047), z_dir=(0, 1, 0))) as fillet_3_2_piece_5:
        with BuildLine():
            CenterArc((FILLET_3_R, FILLET_3_R), FILLET_3_R, 179.99999999455238, 90.00000000544753)
            Line((9.508169e-11, FILLET_3_R), (0, 0))
            Line((0, 0), (FILLET_3_R, -4e-17))
        make_face()
    extrude(amount=11.500000000475397, mode=Mode.SUBTRACT)
    with BuildSketch(Plane(origin=(-12.499999999999996, -11.249999999999995, -2), x_dir=(0, -1, 0), z_dir=(-1, 0, 0))) as fillet_3_2_piece_6:
        with BuildLine():
            CenterArc((FILLET_3_R, FILLET_3_R), FILLET_3_R, 180, 90)
            Line((0, FILLET_3_R), (0, 0))
            Line((0, 0), (FILLET_3_R, 0))
        make_face()
    extrude(amount=6.500000000000007, mode=Mode.SUBTRACT)
    with BuildSketch(Plane(origin=(-8.999999999999996, -7.749999999999995, 3), x_dir=(1, 0, 5.9e-16), z_dir=(5.9e-16, 0, -1))) as fillet_3_2_piece_7:
        with BuildLine():
            CenterArc((FILLET_3_R, FILLET_3_R), FILLET_3_R, 179.9999999999999, 90.00000000000011)
            Line((0, FILLET_3_R), (0, 0))
            Line((0, 0), (FILLET_3_R, 0))
        make_face()
    extrude(amount=3.5000000000000044, mode=Mode.SUBTRACT)
    with BuildSketch(Plane(origin=(-12.499999999999996, 10.950000000000001, -2), x_dir=(0, 1, 0), z_dir=(-1, 0, 0))) as fillet_3_2_piece_8:
        with BuildLine():
            CenterArc((FILLET_3_R, -FILLET_3_R), FILLET_3_R, 90, 90)
            Line((0, -FILLET_3_R), (0, 0))
            Line((0, 0), (FILLET_3_R, 0))
        make_face()
    extrude(amount=6.5000000000000036, mode=Mode.SUBTRACT)
    with BuildSketch(Plane(origin=(-16.500000000000004, -11.249999999999995, 3), x_dir=(1, -1.6e-16, 0), z_dir=(1.6e-16, 1, 0))) as fillet_3_2_piece_9:
        with BuildLine():
            CenterArc((FILLET_3_R, -FILLET_3_R), FILLET_3_R, 90, 90)
            Line((0, -FILLET_3_R), (0, 0))
            Line((0, 0), (FILLET_3_R, 0))
        make_face()
    extrude(amount=22.199999999999996, mode=Mode.SUBTRACT)
    with BuildSketch(Plane(origin=(31.48033667702287, 9.499999999796358, 3.8301026410074526), x_dir=(-0.9507864860193447, 0, -0.3098468299063047), z_dir=(0, 1, 0))) as fillet_3_2_piece_10:
        with BuildLine():
            CenterArc((FILLET_3_R, FILLET_3_R), FILLET_3_R, 179.99999999533287, 90.00000000466707)
            Line((8.145458e-11, FILLET_3_R), (0, 0))
            Line((0, 0), (FILLET_3_R, 3e-17))
        make_face()
    extrude(amount=11.500000000407283, mode=Mode.SUBTRACT)
    with BuildSketch(Plane(origin=(27.76217471708626, 21.00000000000001, 15.239540473340494), x_dir=(0.30984682998375185, 0, -0.9507864859941059), z_dir=(0, -1, 0))) as fillet_3_2_piece_11:
        with BuildLine():
            CenterArc((FILLET_3_R, -FILLET_3_R), FILLET_3_R, 90, 90.00000000000017)
            Line((-1.11e-15, -FILLET_3_R), (0, 0))
            Line((0, 0), (FILLET_3_R, -3e-17))
        make_face()
    extrude(amount=7.125196054000007, mode=Mode.SUBTRACT)
    with BuildSketch(Plane(origin=(27.76217471708626, -13.500000000000005, 15.239540473340494), x_dir=(0.30984682998375185, 0, -0.9507864859941059), z_dir=(0, -1, 0))) as fillet_3_2_piece_12:
        with BuildLine():
            CenterArc((FILLET_3_R, -FILLET_3_R), FILLET_3_R, 90, 90.00000000000017)
            Line((-1.11e-15, -FILLET_3_R), (0, 0))
            Line((0, 0), (FILLET_3_R, -3e-17))
        make_face()
    extrude(amount=7.500000000000007, mode=Mode.SUBTRACT)
    with BuildSketch(Plane(origin=(18.048723570989278, -21.000000000034067, 18.384639818191683), x_dir=(0.30984682998375124, 0, -0.950786485994106), z_dir=(0, 1, 0))) as fillet_3_2_piece_13:
        with BuildLine():
            CenterArc((FILLET_3_R, FILLET_3_R), FILLET_3_R, 179.99999999921968, 90.00000000078029)
            Line((1.362118e-11, FILLET_3_R), (0, 0))
            Line((0, 0), (FILLET_3_R, 0))
        make_face()
    extrude(amount=7.500000000068111, mode=Mode.SUBTRACT)
    with BuildSketch(Plane(origin=(10.917824926027595, -21.000000000000014, 16.060788593297282), x_dir=(0.950786485994105, 0, 0.3098468299837545), z_dir=(0, 1, 0))) as fillet_3_2_piece_14:
        with BuildLine():
            CenterArc((FILLET_3_R, FILLET_3_R), FILLET_3_R, 179.99999999999997, 90.00000000000011)
            Line((0, FILLET_3_R), (0, 0))
            Line((0, 0), (FILLET_3_R, 0))
        make_face()
    extrude(amount=7.500000000000007, mode=Mode.SUBTRACT)
    with BuildSketch(Plane(origin=(18.0487235709935, 13.874803945965944, 18.384639818178734), x_dir=(0.3098468299837508, 0, -0.9507864859941063), z_dir=(0, 1, 0))) as fillet_3_2_piece_15:
        with BuildLine():
            CenterArc((FILLET_3_R, FILLET_3_R), FILLET_3_R, 179.99999999999994, 90)
            Line((4.52e-15, FILLET_3_R), (0, 0))
            Line((0, 0), (FILLET_3_R, -4e-17))
        make_face()
    extrude(amount=7.125196054068134, mode=Mode.SUBTRACT)
    with BuildSketch(Plane(origin=(10.917824926027592, 13.874803946000004, 16.060788593297286), x_dir=(0.950786485994106, 0, 0.3098468299837513), z_dir=(0, 1, 0))) as fillet_3_2_piece_16:
        with BuildLine():
            CenterArc((FILLET_3_R, FILLET_3_R), FILLET_3_R, 179.9999999999999, 90)
            Line((1.12e-15, FILLET_3_R), (0, 0))
            Line((0, 0), (FILLET_3_R, 2e-17))
        make_face()
    extrude(amount=7.125196054000014, mode=Mode.SUBTRACT)
    with BuildSketch(Plane(origin=(-16.5, -20.301898050140334, 2), x_dir=(0.948683298050514, 0, 0.31622776601683716), z_dir=(0, 1, 0))) as fillet_3_2_piece_17:
        with BuildLine():
            CenterArc((FILLET_3_R * 0.720759220056, FILLET_3_R), FILLET_3_R, 198.43494882292194, 71.56505117707798)
            Line((-FILLET_3_R * 0.227924077994, FILLET_3_R * 0.683772233983), (0, 0))
            Line((0, 0), (FILLET_3_R * 0.720759220056, 0))
        make_face()
    extrude(amount=6.103796100280647, mode=Mode.SUBTRACT)
    with BuildSketch(Plane(origin=(-1.5000000000000036, -18.90569415042096, 7), x_dir=(1, 0, 0), z_dir=(0, 1, 0))) as fillet_3_2_piece_18:
        with BuildLine():
            CenterArc((FILLET_3_R * 0.162277660168, FILLET_3_R), FILLET_3_R, 251.56505117707798, 18.434948822922024)
            Line((-FILLET_3_R * 0.153950105848, FILLET_3_R * 0.0513167019495), (0, 0))
            Line((0, 0), (FILLET_3_R * 0.162277660168, 0))
        make_face()
    extrude(amount=3.311388300841898, mode=Mode.SUBTRACT)
    with BuildSketch(Plane(origin=(-8.999999999999998, 7.749999999999998, -0.5), x_dir=(0, 1, 0), z_dir=(0, 0, 1))) as fillet_3_2_piece_19:
        with BuildLine():
            CenterArc((FILLET_3_R, -FILLET_3_R), FILLET_3_R, 90, 89.99999999999994)
            Line((0, -FILLET_3_R), (0, 0))
            Line((0, 0), (FILLET_3_R, 0))
        make_face()
    extrude(amount=3.5, mode=Mode.SUBTRACT)
    with BuildSketch(Plane(origin=(-16.5, 13.874803946020762, 7), x_dir=(1, -1.67e-15, 0), z_dir=(1.67e-15, 1, 0))) as fillet_3_2_piece_20:
        with BuildLine():
            CenterArc((FILLET_3_R, FILLET_3_R), FILLET_3_R, 180, 90)
            Line((0, FILLET_3_R), (0, 0))
            Line((0, 0), (FILLET_3_R, 0))
        make_face()
    extrude(amount=7.125196053979245, mode=Mode.SUBTRACT)
    with BuildSketch(Plane(origin=(30.87589166823087, 9.499999999999993, 5.684884069354348), x_dir=(0.309846829983754, 0, -0.9507864859941052), z_dir=(0, 1, 0))) as fillet_3_2_piece_21:
        with BuildLine():
            CenterArc((FILLET_3_R, FILLET_3_R), FILLET_3_R, 179.99999999999974, 90.00000000000034)
            Line((8.5e-16, FILLET_3_R), (0, 0))
            Line((0, 0), (FILLET_3_R, 2e-17))
        make_face()
    extrude(amount=6.874803946020769, mode=Mode.SUBTRACT)
    with BuildSketch(Plane(origin=(30.87589166823087, -9.499999999999991, 5.684884069354353), x_dir=(0.3098468299837505, 0, -0.9507864859941063), z_dir=(0, -1, 0))) as fillet_3_2_piece_22:
        with BuildLine():
            CenterArc((FILLET_3_R, -FILLET_3_R), FILLET_3_R, 90.00000000000013, 90.00000000000011)
            Line((4.47e-15, -FILLET_3_R), (0, 0))
            Line((0, 0), (FILLET_3_R, 3e-17))
        make_face()
    extrude(amount=6.500000000000011, mode=Mode.SUBTRACT)

    # Move Face 4: a face moved inward by 0.1
    extrude(part.faces().sort_by_distance((22.624034471, 8, 3.573370802))[0], amount=MOVE_FACE_4_BY, dir=(0, -1, 0), mode=Mode.SUBTRACT)

    # Move Face 4 2: a face moved inward by 0.1
    extrude(part.faces().sort_by_distance((22.624034471, -8, 3.573370802))[0], amount=MOVE_FACE_4_2_BY, dir=(0, 1, 0), mode=Mode.SUBTRACT)

    # Move Face 5: a face moved inward by 0.05
    extrude(part.faces().sort_by_distance((26.322013729, 12, 3.174964207))[0], amount=MOVE_FACE_5_BY, dir=(0, 1, 0), mode=Mode.SUBTRACT)

    # Move Face 5 2: a face moved inward by 0.05
    extrude(part.faces().sort_by_distance((26.322013729, -12, 3.174964207))[0], amount=MOVE_FACE_5_2_BY, dir=(0, -1, 0), mode=Mode.SUBTRACT)

    # 圆角4
    fillet_4_edges = [part.edges().sort_by_distance(p)[0] for p in [
        (20.895632237660646, 12.000000000000002, 4.035991270530513),
        (20.895632237660646, -11.999999999999996, 4.035991270530514),
        (23.895290784981295, -7.899999999999997, 4.513534289507266),
        (23.895290784981295, 7.9, 4.513534289507259),
    ]]
    fillet(fillet_4_edges, radius=FILLET_4_R)

    # 圆角5
    fillet_5_edges = [part.edges().sort_by_distance(p)[0] for p in [
        (-8.999999999999996, 3.2499999999999982, 2.5),
        (-8.999999999999996, -3.2499999999999947, 2.5),
    ]]
    fillet(fillet_5_edges, radius=FILLET_5_R)


solid = part.part
